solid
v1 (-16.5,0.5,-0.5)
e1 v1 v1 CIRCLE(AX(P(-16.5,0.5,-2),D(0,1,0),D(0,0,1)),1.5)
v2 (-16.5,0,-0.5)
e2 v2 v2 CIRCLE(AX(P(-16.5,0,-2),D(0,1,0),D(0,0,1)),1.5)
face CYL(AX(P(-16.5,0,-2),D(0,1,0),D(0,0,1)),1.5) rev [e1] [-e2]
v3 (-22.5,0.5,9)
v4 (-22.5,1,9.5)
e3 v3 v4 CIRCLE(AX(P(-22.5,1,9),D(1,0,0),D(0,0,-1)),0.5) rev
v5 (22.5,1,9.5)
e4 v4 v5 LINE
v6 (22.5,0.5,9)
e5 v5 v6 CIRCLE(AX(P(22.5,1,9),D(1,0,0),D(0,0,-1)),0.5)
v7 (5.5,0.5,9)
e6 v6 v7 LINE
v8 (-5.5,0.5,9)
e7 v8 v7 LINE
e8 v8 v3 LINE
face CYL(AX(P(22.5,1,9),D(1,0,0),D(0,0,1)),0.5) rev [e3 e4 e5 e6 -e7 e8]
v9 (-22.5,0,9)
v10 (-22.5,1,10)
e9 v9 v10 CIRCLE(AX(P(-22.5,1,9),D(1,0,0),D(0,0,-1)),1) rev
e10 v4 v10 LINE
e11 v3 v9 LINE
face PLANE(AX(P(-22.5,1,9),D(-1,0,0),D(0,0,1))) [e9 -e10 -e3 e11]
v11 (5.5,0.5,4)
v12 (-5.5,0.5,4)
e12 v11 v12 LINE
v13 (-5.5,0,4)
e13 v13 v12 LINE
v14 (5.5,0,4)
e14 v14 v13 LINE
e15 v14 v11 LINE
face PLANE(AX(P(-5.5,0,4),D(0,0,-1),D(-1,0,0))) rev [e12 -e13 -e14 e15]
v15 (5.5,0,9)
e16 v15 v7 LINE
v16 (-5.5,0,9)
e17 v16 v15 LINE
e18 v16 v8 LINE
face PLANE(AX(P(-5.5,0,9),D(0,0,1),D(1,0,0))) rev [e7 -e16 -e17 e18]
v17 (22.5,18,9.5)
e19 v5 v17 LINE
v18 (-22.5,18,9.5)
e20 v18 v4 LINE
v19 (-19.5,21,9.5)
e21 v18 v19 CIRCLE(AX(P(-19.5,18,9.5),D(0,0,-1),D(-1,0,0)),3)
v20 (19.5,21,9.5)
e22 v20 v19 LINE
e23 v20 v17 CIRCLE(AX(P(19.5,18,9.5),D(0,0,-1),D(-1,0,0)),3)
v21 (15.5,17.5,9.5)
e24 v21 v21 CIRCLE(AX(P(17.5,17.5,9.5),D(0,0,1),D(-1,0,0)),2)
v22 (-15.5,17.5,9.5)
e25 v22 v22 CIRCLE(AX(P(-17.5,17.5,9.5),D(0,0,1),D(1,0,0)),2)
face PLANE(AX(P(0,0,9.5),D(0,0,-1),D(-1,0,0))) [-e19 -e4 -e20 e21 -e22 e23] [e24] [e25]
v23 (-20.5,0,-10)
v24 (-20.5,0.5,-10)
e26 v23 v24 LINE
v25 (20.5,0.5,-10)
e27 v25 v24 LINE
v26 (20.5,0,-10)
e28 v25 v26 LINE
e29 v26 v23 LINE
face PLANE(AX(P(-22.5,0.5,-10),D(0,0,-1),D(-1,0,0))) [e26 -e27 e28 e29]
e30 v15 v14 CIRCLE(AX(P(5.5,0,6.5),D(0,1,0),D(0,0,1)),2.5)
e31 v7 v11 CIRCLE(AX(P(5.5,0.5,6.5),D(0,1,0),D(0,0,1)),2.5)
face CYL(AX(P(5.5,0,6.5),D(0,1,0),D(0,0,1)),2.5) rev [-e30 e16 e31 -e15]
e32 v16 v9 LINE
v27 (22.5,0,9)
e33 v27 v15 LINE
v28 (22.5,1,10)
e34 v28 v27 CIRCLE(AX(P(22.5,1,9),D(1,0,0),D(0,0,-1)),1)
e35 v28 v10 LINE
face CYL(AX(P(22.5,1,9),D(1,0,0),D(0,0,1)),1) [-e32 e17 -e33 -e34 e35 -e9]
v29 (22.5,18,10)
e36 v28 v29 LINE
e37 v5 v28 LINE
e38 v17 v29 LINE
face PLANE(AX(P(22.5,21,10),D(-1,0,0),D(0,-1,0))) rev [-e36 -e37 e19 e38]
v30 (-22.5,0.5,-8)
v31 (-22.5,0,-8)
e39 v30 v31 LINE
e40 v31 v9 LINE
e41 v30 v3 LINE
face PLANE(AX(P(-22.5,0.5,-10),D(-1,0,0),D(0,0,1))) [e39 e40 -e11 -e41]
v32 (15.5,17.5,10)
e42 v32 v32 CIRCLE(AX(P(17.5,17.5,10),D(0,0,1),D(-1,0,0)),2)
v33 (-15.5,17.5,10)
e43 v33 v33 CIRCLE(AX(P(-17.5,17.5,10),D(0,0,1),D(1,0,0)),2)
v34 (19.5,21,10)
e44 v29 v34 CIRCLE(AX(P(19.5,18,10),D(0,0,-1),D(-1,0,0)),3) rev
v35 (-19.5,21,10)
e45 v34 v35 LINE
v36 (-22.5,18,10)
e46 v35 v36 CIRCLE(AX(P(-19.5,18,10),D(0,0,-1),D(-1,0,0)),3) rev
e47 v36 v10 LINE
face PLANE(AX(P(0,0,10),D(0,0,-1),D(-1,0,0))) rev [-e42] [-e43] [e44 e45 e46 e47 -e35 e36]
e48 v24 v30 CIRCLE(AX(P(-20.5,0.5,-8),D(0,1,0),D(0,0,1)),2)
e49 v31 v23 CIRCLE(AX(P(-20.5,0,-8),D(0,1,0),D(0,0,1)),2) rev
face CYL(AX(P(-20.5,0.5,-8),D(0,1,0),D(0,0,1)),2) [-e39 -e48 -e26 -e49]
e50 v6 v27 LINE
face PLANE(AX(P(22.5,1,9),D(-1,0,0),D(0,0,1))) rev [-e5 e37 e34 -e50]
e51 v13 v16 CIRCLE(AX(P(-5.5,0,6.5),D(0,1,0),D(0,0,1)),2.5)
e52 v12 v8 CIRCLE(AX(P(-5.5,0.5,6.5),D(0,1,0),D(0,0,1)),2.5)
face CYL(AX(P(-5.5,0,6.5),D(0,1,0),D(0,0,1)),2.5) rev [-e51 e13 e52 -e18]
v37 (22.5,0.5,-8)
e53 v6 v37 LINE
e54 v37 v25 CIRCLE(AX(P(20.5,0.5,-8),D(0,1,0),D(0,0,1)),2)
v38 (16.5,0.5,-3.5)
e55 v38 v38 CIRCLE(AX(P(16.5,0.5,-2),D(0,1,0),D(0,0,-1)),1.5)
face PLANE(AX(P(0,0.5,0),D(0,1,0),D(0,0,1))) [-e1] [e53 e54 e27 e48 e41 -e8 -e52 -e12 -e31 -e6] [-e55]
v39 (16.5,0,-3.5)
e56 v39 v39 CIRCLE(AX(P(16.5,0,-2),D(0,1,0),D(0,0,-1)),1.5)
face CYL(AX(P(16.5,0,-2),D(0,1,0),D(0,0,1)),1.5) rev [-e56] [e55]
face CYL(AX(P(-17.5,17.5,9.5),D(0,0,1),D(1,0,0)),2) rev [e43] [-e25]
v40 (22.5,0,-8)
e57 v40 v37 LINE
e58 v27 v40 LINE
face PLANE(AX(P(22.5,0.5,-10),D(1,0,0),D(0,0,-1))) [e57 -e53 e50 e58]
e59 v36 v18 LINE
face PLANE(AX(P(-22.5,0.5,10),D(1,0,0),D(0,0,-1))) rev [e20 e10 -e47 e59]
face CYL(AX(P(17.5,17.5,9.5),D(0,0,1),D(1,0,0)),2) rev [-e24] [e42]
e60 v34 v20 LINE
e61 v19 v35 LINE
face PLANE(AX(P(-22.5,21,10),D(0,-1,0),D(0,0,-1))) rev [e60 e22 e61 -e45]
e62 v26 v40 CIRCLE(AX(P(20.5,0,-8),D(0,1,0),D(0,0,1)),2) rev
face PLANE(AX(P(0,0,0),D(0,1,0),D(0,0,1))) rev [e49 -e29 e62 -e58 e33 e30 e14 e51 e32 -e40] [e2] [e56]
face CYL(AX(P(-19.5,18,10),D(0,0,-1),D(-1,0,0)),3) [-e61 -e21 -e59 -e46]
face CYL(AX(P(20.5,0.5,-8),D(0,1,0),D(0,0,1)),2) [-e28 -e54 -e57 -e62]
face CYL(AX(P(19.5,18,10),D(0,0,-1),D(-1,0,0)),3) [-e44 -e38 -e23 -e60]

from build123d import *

# Parameters (mm, degrees)
SKETCH_1_W                       = 45
SKETCH_1_H                       = 20
EXTRUDE_1_DEPTH                  = 0.5
SM_EDGE_FLANGE_1_STRIP_W         = 3
SM_EDGE_FLANGE_1_STRIP_H         = 0.5
SM_EDGE_FLANGE_1_STRIP_CUT_DEPTH = 45
SM_EDGE_FLANGE_1_DEPTH           = 45
SKETCH_9_R                       = 2
CUT_EXTRUDE_1_DEPTH              = 0.5
CUT_EXTRUDE_2_DEPTH              = 0.5
SKETCH_11_R                      = 1.5
CUT_EXTRUDE_3_DEPTH              = 0.5
FILLET_1_R                       = 3
FILLET_2_R                       = 2


# Sheet-metal steps are written as plain solids
with BuildPart() as part:
    # Sketch 1 → Бобышка-Вытянуть1 (new body)
    with BuildSketch(Plane(origin=(0, 0, 0), x_dir=(1, 0, 0), z_dir=(0, 1, 0))):
        Rectangle(SKETCH_1_W, SKETCH_1_H)
    extrude(amount=EXTRUDE_1_DEPTH)

    # Ребро-кромка1 strip (across the edge) → Ребро-кромка1 strip cut (cut)
    with BuildSketch(Plane(origin=(-22.5, 0.5, 10), x_dir=(0, 0, -1), z_dir=(1, 0, 0))):
        with Locations((-0.5, -0.25)):
            Rectangle(SM_EDGE_FLANGE_1_STRIP_W, SM_EDGE_FLANGE_1_STRIP_H)
    extrude(amount=SM_EDGE_FLANGE_1_STRIP_CUT_DEPTH, mode=Mode.SUBTRACT)

    # Ребро-кромка1 section (across the edge) → Ребро-кромка1 (add)
    with BuildSketch(Plane(origin=(-22.5, 0.5, 10), x_dir=(0, 0, -1), z_dir=(1, 0, 0))):
        with BuildLine():
            Line((0, 0.5), (0, 20.5))
            Line((0, 20.5), (0.5, 20.5))
            Line((0.5, 20.5), (0.5, 0.5))
            ThreePointArc((0.5, 0.5), (0.646446609, 0.146446609), (1, 0))
            Line((1, 0), (1, -0.5))
            ThreePointArc((1, -0.5), (0.292893219, -0.207106781), (0, 0.5))
        make_face()
    extrude(amount=SM_EDGE_FLANGE_1_DEPTH)

    # Эскиз9 → Вырез-Вытянуть1 (cut)
    with BuildSketch(Plane.XY.offset(10)):
        with Locations((-17.5, 17.5)):
            Circle(SKETCH_9_R)
        with Locations(Location((17.5, 17.5, 0), (0, 0, 180))):
            Circle(SKETCH_9_R)
    extrude(amount=-CUT_EXTRUDE_1_DEPTH, mode=Mode.SUBTRACT)

    # Эскиз10 → Вырез-Вытянуть2 (cut)
    with BuildSketch(Plane(origin=(0, 0.5, 0), x_dir=(1, 0, 0), z_dir=(0, 1, 0))):
        with BuildLine():
            Line((-5.5, -4), (5.5, -4))
            ThreePointArc((5.5, -4), (8, -6.5), (5.5, -9))
            Line((5.5, -9), (-5.5, -9))
            ThreePointArc((-5.5, -9), (-8, -6.5), (-5.5, -4))
        make_face()
    extrude(amount=-CUT_EXTRUDE_2_DEPTH, mode=Mode.SUBTRACT)

    # Эскиз11 → Вырез-Вытянуть3 (cut)
    with BuildSketch(Plane(origin=(0, 0.5, 0), x_dir=(1, 0, 0), z_dir=(0, 1, 0))):
        with Locations(Location((-16.5, 2, 0), (0, 0, 270))):
            Circle(SKETCH_11_R)
        with Locations(Location((16.5, 2, 0), (0, 0, 90))):
            Circle(SKETCH_11_R)
    extrude(amount=-CUT_EXTRUDE_3_DEPTH, mode=Mode.SUBTRACT)

    # Скругление1
    fillet_1_edges = [part.edges().sort_by_distance(p)[0] for p in [
        (-22.5, 21, 9.75),
        (22.5, 21, 9.75),
    ]]
    fillet(fillet_1_edges, radius=FILLET_1_R)

    # Скругление2
    fillet_2_edges = [part.edges().sort_by_distance(p)[0] for p in [
        (22.5, 0.25, -10),
        (-22.5, 0.25, -10),
    ]]
    fillet(fillet_2_edges, radius=FILLET_2_R)


solid = part.part
